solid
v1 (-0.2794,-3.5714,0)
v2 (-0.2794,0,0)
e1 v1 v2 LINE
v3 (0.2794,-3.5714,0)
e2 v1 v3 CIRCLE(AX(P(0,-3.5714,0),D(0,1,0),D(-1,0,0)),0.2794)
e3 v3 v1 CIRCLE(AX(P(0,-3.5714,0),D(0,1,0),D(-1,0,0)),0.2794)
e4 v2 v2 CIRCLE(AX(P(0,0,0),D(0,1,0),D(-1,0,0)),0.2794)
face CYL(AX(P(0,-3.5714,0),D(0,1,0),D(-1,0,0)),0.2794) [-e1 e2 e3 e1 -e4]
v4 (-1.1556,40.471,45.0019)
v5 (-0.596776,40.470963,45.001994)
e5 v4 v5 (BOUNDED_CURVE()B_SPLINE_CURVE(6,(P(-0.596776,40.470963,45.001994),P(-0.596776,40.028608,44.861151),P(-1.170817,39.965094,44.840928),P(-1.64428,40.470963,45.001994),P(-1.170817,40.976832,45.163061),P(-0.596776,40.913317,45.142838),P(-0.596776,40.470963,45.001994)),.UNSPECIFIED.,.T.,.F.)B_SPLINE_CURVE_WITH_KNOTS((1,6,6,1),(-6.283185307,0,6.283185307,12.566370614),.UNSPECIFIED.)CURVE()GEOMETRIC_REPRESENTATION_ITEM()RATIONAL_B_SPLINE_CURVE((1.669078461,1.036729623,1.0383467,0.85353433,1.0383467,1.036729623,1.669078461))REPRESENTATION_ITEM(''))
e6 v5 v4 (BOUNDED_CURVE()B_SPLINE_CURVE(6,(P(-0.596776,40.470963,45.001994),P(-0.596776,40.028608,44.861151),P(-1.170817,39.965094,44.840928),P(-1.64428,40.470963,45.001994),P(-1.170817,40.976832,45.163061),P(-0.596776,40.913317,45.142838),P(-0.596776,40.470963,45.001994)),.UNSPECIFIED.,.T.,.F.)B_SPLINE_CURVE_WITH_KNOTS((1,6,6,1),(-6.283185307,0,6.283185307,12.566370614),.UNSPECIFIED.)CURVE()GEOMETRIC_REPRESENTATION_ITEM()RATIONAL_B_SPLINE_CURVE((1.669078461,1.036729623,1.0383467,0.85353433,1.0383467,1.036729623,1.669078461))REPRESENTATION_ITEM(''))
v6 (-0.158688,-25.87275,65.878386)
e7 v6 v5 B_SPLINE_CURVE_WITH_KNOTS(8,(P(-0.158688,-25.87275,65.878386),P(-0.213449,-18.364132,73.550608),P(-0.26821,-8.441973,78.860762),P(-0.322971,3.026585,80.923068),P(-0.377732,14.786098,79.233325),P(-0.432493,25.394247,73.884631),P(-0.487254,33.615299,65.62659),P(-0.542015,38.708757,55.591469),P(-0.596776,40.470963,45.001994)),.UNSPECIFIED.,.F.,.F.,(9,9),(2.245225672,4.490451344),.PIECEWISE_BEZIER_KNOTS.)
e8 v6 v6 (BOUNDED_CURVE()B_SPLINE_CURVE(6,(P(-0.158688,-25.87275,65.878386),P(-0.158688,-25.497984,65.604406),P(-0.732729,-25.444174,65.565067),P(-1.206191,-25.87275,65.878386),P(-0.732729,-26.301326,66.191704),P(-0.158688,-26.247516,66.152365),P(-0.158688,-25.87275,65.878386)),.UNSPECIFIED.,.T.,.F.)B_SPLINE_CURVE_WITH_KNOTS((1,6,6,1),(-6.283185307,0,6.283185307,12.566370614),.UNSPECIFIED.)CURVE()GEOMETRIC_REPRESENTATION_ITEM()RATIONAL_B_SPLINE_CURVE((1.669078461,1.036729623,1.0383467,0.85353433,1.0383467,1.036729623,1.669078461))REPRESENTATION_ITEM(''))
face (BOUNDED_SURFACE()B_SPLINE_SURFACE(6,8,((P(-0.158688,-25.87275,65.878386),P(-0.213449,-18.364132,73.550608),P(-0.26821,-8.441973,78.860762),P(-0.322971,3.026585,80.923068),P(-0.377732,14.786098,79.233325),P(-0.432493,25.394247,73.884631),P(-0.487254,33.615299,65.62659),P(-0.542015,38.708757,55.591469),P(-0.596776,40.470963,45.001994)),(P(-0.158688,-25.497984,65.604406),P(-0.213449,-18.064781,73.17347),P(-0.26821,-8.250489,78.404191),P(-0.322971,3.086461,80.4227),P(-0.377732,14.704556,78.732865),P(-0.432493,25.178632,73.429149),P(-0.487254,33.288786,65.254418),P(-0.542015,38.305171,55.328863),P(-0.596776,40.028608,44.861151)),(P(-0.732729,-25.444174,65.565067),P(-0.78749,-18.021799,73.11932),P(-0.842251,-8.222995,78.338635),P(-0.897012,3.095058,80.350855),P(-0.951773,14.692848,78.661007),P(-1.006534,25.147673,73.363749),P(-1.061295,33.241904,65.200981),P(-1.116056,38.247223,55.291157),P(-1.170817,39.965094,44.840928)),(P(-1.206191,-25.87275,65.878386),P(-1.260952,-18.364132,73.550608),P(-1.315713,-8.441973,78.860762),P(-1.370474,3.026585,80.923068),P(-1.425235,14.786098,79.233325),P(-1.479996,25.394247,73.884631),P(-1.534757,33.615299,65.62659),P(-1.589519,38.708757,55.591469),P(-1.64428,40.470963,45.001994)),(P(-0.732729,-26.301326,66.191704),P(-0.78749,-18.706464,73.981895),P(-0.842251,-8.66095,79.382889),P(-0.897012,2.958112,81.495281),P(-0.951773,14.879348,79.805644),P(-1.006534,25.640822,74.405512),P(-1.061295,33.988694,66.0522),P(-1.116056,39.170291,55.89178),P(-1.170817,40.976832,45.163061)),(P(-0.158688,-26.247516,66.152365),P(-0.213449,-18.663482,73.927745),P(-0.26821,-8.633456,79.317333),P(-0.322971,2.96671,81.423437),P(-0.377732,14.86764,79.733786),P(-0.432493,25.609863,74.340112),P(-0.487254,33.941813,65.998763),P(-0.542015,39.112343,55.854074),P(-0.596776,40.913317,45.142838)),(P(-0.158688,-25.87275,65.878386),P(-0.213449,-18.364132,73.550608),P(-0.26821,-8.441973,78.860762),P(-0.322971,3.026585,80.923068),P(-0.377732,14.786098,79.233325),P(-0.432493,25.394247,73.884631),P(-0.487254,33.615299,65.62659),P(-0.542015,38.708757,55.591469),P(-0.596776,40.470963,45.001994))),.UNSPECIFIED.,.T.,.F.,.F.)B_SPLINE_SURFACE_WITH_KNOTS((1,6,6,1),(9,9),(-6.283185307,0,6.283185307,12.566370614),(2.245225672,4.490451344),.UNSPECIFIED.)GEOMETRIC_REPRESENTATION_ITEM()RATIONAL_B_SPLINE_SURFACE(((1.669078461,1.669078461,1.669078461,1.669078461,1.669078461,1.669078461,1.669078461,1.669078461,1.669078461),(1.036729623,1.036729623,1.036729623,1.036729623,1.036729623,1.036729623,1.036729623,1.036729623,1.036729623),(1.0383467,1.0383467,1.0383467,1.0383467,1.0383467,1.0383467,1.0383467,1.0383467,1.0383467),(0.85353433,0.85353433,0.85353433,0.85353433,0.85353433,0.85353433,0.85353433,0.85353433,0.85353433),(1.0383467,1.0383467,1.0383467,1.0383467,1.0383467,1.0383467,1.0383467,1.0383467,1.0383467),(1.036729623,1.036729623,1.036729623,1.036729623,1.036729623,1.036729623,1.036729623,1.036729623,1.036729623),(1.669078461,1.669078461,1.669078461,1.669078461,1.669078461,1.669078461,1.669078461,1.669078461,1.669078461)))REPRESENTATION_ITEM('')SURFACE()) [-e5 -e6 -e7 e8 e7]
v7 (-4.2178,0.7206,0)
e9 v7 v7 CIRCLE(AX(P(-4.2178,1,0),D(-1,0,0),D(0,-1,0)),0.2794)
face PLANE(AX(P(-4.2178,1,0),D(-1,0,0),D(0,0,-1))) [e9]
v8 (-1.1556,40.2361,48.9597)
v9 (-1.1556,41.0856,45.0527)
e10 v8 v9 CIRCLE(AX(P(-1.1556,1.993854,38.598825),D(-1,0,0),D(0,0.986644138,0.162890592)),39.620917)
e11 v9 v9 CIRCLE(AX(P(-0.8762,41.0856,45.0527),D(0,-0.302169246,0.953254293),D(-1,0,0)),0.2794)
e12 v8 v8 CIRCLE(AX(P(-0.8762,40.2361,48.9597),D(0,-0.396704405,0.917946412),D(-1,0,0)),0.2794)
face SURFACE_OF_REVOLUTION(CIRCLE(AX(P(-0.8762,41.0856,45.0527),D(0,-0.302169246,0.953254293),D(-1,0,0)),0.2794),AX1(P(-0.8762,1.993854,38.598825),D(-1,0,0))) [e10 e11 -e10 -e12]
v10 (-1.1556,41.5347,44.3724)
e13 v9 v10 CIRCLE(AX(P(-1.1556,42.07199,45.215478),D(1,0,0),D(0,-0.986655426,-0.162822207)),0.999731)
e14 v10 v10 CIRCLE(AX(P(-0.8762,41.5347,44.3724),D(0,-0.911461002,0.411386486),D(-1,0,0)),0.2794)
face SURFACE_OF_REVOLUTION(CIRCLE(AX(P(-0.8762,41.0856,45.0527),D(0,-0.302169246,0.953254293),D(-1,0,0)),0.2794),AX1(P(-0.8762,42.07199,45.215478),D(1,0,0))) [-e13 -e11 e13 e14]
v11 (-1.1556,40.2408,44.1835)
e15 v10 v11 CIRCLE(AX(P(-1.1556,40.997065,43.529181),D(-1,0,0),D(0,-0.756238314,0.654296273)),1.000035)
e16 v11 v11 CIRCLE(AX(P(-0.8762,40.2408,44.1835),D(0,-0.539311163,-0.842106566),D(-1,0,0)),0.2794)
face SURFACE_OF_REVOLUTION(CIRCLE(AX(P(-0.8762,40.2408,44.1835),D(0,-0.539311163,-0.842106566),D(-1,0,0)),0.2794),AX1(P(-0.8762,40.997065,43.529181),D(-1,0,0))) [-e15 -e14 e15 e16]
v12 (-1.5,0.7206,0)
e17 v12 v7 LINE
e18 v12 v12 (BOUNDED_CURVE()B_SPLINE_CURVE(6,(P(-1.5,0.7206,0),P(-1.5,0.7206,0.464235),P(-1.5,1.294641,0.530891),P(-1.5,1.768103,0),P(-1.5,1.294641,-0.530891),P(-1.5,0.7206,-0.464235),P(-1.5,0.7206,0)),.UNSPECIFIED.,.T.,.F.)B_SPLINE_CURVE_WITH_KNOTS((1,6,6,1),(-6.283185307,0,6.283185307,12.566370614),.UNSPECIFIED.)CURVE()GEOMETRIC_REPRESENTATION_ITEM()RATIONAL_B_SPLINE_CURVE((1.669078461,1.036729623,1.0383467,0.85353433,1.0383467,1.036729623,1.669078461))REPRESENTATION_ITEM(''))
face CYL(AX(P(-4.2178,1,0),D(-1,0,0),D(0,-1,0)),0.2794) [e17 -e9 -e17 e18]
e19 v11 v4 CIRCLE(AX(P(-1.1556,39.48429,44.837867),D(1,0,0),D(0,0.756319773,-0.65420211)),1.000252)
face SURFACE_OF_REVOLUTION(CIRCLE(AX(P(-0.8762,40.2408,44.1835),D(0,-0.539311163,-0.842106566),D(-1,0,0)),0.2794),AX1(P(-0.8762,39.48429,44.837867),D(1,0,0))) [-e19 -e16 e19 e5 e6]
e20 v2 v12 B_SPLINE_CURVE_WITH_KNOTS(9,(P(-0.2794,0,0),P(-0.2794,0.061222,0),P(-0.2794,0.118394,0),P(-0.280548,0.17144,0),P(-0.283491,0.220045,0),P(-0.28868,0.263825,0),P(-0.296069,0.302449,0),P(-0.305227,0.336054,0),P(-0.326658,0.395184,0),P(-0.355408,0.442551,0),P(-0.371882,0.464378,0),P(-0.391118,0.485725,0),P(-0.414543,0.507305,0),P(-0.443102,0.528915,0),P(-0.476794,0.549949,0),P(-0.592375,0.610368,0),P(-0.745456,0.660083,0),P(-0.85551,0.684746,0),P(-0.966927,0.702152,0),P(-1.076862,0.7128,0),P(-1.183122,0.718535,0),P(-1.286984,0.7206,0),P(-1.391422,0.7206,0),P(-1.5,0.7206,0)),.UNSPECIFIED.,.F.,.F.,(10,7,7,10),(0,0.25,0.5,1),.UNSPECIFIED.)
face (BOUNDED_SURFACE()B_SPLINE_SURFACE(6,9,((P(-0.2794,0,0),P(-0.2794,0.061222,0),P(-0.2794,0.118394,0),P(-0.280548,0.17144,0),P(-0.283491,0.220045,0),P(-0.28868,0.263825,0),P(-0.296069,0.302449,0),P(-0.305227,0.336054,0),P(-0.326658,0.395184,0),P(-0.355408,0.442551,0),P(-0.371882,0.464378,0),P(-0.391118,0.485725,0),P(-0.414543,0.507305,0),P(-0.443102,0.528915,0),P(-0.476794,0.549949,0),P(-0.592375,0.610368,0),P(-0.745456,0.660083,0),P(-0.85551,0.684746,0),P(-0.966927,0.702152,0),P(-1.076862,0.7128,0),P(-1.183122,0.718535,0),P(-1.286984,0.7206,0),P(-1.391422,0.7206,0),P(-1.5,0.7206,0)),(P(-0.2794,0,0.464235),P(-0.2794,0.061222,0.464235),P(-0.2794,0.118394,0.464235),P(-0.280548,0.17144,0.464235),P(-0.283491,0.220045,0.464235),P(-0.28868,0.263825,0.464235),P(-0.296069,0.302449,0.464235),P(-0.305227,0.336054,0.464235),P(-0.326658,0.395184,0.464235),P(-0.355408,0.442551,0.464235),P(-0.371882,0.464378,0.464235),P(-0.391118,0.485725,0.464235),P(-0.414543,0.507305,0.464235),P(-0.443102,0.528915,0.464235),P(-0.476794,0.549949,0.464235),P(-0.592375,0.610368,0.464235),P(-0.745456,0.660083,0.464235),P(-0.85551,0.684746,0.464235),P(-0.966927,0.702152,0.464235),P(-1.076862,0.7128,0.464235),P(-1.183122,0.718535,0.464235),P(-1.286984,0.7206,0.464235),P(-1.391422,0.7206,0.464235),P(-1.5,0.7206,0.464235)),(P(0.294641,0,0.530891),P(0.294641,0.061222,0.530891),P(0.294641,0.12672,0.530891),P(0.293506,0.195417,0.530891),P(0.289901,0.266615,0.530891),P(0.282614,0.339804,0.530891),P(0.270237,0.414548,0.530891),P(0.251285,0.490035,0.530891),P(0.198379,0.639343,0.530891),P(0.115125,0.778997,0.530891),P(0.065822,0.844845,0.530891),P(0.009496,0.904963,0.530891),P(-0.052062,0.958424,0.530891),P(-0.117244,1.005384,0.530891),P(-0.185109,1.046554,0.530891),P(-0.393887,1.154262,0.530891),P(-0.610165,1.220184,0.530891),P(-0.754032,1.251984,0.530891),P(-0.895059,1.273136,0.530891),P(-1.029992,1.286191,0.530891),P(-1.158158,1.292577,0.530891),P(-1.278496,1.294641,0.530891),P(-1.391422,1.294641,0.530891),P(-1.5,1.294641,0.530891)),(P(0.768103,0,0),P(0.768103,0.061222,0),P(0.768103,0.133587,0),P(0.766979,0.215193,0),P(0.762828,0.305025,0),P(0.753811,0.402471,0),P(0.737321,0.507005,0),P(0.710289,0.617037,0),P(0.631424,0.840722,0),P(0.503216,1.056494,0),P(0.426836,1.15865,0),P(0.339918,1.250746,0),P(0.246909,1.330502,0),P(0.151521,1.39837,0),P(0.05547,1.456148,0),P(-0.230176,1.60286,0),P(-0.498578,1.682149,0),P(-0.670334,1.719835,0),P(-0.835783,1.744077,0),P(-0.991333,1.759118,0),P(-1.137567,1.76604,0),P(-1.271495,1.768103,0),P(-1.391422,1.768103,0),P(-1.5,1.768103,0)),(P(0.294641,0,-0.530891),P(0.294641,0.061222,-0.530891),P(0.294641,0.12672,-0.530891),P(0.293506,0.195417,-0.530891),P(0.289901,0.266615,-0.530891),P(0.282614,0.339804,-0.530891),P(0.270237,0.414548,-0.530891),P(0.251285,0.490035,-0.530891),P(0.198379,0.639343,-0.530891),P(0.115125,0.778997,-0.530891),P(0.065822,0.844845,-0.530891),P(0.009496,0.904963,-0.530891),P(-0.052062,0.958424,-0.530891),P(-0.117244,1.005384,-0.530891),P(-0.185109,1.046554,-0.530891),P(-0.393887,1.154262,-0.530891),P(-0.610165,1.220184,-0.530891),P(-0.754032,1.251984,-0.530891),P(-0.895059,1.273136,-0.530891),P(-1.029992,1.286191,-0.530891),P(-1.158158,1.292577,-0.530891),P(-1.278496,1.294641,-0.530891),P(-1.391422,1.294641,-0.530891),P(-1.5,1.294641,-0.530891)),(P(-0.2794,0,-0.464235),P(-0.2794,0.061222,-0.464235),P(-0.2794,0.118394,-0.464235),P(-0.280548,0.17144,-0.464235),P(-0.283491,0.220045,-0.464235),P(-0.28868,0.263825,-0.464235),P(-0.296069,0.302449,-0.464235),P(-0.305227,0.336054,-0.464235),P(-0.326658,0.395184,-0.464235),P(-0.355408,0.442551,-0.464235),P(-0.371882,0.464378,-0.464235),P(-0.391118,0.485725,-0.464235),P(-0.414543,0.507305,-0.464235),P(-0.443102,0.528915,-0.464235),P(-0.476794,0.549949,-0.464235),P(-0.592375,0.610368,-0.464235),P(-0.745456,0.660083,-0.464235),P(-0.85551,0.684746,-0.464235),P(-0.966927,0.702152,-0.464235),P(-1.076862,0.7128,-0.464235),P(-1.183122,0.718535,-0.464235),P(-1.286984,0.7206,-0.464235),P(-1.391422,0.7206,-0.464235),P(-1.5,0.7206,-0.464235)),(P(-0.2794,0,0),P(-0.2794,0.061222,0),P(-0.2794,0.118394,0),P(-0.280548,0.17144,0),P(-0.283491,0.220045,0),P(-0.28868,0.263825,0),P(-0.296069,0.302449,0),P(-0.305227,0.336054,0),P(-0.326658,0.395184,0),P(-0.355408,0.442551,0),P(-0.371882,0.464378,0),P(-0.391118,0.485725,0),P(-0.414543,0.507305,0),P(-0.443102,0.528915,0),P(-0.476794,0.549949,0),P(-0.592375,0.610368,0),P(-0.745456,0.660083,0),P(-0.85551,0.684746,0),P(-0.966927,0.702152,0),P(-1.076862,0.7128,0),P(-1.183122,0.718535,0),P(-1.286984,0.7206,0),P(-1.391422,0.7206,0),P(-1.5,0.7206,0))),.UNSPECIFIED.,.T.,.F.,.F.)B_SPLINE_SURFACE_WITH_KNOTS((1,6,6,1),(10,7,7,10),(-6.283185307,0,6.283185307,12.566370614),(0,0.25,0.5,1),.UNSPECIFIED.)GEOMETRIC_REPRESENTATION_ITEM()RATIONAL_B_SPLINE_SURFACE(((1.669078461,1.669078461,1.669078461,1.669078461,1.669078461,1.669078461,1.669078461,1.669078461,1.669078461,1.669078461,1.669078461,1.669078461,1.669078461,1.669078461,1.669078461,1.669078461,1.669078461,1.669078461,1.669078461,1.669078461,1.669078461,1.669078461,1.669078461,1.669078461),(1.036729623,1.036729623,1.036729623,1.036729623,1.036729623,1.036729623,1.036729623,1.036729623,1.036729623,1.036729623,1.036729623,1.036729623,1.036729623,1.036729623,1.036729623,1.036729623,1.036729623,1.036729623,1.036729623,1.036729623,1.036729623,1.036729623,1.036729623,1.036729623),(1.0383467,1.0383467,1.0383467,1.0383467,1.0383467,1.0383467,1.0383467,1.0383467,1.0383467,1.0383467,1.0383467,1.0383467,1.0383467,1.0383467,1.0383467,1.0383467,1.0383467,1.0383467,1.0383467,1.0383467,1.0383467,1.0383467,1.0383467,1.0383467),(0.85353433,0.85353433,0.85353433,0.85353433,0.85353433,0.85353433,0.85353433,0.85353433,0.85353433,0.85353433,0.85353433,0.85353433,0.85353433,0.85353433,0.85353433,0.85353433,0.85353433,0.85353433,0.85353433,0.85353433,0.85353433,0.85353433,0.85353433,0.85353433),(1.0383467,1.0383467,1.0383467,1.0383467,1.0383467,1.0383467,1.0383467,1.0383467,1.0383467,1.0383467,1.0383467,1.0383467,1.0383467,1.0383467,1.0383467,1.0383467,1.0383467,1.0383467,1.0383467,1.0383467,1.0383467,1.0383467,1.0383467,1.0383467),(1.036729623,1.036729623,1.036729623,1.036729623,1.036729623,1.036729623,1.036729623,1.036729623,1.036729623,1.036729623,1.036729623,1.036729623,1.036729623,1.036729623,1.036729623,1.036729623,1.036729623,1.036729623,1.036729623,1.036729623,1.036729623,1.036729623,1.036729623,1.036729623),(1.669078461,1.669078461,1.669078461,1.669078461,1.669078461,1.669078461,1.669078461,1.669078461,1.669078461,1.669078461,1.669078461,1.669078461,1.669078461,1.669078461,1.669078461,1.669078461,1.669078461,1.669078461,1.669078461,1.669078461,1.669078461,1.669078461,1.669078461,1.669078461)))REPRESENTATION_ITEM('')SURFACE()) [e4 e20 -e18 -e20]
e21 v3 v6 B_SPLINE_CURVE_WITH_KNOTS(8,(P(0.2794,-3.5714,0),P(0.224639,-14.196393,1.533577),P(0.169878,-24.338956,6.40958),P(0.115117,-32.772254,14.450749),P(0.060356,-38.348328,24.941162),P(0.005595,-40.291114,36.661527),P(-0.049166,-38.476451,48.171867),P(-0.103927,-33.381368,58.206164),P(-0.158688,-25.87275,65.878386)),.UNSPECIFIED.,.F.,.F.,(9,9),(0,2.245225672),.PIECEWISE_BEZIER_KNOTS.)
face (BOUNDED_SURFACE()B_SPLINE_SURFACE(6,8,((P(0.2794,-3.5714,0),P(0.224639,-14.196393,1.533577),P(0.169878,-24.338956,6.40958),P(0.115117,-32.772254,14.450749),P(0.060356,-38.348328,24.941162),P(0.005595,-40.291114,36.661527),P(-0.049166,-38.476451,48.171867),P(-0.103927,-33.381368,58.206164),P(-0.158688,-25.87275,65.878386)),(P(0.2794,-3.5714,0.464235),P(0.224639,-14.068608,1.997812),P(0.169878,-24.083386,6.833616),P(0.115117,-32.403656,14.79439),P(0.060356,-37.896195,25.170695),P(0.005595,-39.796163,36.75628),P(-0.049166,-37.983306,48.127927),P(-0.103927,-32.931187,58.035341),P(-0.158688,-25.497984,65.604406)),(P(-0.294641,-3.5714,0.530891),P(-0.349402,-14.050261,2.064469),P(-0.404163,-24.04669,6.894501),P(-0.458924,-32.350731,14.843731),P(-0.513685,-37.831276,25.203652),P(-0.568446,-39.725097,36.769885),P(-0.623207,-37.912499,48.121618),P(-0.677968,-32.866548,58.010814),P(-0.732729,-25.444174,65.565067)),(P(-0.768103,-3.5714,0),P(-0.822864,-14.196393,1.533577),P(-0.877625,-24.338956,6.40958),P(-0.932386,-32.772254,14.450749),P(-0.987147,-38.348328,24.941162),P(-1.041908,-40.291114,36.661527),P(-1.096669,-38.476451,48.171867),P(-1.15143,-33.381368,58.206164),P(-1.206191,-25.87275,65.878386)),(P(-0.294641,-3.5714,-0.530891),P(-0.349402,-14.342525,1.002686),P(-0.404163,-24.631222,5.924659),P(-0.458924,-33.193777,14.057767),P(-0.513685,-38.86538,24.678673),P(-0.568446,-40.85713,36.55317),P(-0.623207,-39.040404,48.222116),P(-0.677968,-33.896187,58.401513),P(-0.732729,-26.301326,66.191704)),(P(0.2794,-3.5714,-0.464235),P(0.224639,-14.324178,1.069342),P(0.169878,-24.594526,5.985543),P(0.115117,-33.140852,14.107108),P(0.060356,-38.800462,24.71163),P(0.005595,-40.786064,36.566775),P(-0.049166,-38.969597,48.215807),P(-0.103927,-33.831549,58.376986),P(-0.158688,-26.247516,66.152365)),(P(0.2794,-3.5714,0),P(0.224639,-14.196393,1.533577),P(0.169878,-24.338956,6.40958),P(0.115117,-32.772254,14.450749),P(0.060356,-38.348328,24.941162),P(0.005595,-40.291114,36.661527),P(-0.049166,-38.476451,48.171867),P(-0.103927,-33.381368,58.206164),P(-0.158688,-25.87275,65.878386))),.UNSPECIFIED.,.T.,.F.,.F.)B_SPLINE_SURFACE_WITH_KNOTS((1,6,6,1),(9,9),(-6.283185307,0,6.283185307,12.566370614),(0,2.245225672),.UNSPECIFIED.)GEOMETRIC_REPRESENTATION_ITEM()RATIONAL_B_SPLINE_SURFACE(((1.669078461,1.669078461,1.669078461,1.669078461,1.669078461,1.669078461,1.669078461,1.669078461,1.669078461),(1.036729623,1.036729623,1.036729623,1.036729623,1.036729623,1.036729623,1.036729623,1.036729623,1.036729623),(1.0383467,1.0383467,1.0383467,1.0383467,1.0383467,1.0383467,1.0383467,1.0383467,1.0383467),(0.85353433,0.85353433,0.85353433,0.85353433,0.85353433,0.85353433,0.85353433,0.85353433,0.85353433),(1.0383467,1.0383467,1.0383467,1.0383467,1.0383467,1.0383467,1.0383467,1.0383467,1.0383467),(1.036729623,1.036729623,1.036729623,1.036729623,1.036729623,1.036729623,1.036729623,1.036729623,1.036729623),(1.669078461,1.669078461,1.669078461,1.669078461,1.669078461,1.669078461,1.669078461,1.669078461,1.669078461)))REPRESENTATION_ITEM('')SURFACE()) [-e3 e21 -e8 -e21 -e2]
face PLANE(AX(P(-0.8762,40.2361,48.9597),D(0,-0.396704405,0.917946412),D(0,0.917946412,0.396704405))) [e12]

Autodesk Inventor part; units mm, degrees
ref_plane "XY Plane" through (0, 0, 0) normal (0, 0, 1) x (1, 0, 0)
sketch "Sketch1" plane through (0, 0, 0) normal (0, 1, 0) x (-1, 0, 0)
  circle A0 centre (0, 0) radius 0.2794
  dimension "d0" = 0.5588
sketch "Sketch2" plane through (0, 0, 0) normal (0, 0, 1) x (1, 0, 0)
  line L0 (0, -3.5714) -> (0, 0)
  line L1 (-4.2178, 1) -> (-1.5, 1)
  circle A0 centre (-38.6, 2) radius 39 construction
  spline S0 degree 4 poles (-1.5, 1) (-1.2557, 1) (-0.7672, 1) (0, 0.8266) (0, 0.2755) (0, 0) knots 0 0 0 0 0 0.5 1 1 1 1 1
  dimension "d2" = 78
  dimension "d1" = 38.6
  dimension "d3" = 1
  dimension "d4" = 1.5
  dimension "d5" = 1
  dimension "d6" = 2.7178
sweep "Sweep1" add profiles "Sketch1" path "Sketch2"
sketch "Sketch3" plane through (0, -3.5714, 0) normal (0, -1, 0) x (1, 0, 0)
  circle A0 centre (0, 0) radius 0.2794 projected
  point P0 (0, 0)
ref_plane "Work Plane1" through (-38.6, 2, 0) normal (0, 1, 0) x (-1, 0, 0)
sketch "Sketch5" plane through (-38.6, 2, 0) normal (0, 1, 0) x (-1, 0, 0)
  line L0 (-38.6, 38.6) -> (-41.3178, 38.6)
  point P0 (-38.6, 0)
  dimension "d18" = 38.6
  dimension "d19" = 2.7178
coil "Coil2" sketch "Sketch3" operation add axis through (0, 2, 38.6) along (-1, 0, 0) pitch 1.25 turns 0.700941 hand right
sketch "Sketch6" plane through (-0.8762, 40.471, 45.0019) normal (0, 0.3033858, -0.9528678) x (-1, 0, 0)
  circle A0 centre (0, 0) radius 0.2794 projected
  point P0 (-0.8762, -52.2164)
  point P1 (-0.2794, 0)
ref_plane "Work Plane2" through (-0.8762, 40.471, 45.0019) normal (1, 0, 0) x (0, 1, 0)
sketch "Sketch7" plane through (-0.8762, 40.471, 45.0019) normal (1, 0, 0) x (0, 1, 0)
  circle A0 centre (-38.471, -6.4019) radius 39 construction
  circle A1 centre (-38.471, -6.4019) radius 39.3073 construction
  circle A2 centre (-38.471, -6.4019) radius 39.6147 construction
  arc A3 (-0.2302, -0.8184) -> (0, 0) centre (-0.9864, -0.1642) ccw
  arc A4 (-0.2302, -0.8184) -> (1.0637, -0.6295) centre (0.5261, -1.4727) ccw
  arc A5 (0.6146, 0.0508) -> (1.0637, -0.6295) centre (1.6013, 0.2137) ccw
  arc A6 (0.6146, 0.0508) -> (-0.2349, 3.9578) centre (-38.471, -6.4019) ccw
  point P0 (-40.471, -45.0019)
  dimension "d28" = 0.6147
  dimension "d29" = 0.3073
  dimension "d30" = 1
  dimension "d31" = 4
sweep "Sweep2" add profiles "Sketch6" path "Sketch7"
equation "\"d18\" = d1"
equation "\"d19\" = d6"
equation "\"d28\" = 1.1 * d0"
equation "\"d29\" = 0.5 * d28"
properties part number "+XPanel_AntennaStowed-Y" material "Titanium"
